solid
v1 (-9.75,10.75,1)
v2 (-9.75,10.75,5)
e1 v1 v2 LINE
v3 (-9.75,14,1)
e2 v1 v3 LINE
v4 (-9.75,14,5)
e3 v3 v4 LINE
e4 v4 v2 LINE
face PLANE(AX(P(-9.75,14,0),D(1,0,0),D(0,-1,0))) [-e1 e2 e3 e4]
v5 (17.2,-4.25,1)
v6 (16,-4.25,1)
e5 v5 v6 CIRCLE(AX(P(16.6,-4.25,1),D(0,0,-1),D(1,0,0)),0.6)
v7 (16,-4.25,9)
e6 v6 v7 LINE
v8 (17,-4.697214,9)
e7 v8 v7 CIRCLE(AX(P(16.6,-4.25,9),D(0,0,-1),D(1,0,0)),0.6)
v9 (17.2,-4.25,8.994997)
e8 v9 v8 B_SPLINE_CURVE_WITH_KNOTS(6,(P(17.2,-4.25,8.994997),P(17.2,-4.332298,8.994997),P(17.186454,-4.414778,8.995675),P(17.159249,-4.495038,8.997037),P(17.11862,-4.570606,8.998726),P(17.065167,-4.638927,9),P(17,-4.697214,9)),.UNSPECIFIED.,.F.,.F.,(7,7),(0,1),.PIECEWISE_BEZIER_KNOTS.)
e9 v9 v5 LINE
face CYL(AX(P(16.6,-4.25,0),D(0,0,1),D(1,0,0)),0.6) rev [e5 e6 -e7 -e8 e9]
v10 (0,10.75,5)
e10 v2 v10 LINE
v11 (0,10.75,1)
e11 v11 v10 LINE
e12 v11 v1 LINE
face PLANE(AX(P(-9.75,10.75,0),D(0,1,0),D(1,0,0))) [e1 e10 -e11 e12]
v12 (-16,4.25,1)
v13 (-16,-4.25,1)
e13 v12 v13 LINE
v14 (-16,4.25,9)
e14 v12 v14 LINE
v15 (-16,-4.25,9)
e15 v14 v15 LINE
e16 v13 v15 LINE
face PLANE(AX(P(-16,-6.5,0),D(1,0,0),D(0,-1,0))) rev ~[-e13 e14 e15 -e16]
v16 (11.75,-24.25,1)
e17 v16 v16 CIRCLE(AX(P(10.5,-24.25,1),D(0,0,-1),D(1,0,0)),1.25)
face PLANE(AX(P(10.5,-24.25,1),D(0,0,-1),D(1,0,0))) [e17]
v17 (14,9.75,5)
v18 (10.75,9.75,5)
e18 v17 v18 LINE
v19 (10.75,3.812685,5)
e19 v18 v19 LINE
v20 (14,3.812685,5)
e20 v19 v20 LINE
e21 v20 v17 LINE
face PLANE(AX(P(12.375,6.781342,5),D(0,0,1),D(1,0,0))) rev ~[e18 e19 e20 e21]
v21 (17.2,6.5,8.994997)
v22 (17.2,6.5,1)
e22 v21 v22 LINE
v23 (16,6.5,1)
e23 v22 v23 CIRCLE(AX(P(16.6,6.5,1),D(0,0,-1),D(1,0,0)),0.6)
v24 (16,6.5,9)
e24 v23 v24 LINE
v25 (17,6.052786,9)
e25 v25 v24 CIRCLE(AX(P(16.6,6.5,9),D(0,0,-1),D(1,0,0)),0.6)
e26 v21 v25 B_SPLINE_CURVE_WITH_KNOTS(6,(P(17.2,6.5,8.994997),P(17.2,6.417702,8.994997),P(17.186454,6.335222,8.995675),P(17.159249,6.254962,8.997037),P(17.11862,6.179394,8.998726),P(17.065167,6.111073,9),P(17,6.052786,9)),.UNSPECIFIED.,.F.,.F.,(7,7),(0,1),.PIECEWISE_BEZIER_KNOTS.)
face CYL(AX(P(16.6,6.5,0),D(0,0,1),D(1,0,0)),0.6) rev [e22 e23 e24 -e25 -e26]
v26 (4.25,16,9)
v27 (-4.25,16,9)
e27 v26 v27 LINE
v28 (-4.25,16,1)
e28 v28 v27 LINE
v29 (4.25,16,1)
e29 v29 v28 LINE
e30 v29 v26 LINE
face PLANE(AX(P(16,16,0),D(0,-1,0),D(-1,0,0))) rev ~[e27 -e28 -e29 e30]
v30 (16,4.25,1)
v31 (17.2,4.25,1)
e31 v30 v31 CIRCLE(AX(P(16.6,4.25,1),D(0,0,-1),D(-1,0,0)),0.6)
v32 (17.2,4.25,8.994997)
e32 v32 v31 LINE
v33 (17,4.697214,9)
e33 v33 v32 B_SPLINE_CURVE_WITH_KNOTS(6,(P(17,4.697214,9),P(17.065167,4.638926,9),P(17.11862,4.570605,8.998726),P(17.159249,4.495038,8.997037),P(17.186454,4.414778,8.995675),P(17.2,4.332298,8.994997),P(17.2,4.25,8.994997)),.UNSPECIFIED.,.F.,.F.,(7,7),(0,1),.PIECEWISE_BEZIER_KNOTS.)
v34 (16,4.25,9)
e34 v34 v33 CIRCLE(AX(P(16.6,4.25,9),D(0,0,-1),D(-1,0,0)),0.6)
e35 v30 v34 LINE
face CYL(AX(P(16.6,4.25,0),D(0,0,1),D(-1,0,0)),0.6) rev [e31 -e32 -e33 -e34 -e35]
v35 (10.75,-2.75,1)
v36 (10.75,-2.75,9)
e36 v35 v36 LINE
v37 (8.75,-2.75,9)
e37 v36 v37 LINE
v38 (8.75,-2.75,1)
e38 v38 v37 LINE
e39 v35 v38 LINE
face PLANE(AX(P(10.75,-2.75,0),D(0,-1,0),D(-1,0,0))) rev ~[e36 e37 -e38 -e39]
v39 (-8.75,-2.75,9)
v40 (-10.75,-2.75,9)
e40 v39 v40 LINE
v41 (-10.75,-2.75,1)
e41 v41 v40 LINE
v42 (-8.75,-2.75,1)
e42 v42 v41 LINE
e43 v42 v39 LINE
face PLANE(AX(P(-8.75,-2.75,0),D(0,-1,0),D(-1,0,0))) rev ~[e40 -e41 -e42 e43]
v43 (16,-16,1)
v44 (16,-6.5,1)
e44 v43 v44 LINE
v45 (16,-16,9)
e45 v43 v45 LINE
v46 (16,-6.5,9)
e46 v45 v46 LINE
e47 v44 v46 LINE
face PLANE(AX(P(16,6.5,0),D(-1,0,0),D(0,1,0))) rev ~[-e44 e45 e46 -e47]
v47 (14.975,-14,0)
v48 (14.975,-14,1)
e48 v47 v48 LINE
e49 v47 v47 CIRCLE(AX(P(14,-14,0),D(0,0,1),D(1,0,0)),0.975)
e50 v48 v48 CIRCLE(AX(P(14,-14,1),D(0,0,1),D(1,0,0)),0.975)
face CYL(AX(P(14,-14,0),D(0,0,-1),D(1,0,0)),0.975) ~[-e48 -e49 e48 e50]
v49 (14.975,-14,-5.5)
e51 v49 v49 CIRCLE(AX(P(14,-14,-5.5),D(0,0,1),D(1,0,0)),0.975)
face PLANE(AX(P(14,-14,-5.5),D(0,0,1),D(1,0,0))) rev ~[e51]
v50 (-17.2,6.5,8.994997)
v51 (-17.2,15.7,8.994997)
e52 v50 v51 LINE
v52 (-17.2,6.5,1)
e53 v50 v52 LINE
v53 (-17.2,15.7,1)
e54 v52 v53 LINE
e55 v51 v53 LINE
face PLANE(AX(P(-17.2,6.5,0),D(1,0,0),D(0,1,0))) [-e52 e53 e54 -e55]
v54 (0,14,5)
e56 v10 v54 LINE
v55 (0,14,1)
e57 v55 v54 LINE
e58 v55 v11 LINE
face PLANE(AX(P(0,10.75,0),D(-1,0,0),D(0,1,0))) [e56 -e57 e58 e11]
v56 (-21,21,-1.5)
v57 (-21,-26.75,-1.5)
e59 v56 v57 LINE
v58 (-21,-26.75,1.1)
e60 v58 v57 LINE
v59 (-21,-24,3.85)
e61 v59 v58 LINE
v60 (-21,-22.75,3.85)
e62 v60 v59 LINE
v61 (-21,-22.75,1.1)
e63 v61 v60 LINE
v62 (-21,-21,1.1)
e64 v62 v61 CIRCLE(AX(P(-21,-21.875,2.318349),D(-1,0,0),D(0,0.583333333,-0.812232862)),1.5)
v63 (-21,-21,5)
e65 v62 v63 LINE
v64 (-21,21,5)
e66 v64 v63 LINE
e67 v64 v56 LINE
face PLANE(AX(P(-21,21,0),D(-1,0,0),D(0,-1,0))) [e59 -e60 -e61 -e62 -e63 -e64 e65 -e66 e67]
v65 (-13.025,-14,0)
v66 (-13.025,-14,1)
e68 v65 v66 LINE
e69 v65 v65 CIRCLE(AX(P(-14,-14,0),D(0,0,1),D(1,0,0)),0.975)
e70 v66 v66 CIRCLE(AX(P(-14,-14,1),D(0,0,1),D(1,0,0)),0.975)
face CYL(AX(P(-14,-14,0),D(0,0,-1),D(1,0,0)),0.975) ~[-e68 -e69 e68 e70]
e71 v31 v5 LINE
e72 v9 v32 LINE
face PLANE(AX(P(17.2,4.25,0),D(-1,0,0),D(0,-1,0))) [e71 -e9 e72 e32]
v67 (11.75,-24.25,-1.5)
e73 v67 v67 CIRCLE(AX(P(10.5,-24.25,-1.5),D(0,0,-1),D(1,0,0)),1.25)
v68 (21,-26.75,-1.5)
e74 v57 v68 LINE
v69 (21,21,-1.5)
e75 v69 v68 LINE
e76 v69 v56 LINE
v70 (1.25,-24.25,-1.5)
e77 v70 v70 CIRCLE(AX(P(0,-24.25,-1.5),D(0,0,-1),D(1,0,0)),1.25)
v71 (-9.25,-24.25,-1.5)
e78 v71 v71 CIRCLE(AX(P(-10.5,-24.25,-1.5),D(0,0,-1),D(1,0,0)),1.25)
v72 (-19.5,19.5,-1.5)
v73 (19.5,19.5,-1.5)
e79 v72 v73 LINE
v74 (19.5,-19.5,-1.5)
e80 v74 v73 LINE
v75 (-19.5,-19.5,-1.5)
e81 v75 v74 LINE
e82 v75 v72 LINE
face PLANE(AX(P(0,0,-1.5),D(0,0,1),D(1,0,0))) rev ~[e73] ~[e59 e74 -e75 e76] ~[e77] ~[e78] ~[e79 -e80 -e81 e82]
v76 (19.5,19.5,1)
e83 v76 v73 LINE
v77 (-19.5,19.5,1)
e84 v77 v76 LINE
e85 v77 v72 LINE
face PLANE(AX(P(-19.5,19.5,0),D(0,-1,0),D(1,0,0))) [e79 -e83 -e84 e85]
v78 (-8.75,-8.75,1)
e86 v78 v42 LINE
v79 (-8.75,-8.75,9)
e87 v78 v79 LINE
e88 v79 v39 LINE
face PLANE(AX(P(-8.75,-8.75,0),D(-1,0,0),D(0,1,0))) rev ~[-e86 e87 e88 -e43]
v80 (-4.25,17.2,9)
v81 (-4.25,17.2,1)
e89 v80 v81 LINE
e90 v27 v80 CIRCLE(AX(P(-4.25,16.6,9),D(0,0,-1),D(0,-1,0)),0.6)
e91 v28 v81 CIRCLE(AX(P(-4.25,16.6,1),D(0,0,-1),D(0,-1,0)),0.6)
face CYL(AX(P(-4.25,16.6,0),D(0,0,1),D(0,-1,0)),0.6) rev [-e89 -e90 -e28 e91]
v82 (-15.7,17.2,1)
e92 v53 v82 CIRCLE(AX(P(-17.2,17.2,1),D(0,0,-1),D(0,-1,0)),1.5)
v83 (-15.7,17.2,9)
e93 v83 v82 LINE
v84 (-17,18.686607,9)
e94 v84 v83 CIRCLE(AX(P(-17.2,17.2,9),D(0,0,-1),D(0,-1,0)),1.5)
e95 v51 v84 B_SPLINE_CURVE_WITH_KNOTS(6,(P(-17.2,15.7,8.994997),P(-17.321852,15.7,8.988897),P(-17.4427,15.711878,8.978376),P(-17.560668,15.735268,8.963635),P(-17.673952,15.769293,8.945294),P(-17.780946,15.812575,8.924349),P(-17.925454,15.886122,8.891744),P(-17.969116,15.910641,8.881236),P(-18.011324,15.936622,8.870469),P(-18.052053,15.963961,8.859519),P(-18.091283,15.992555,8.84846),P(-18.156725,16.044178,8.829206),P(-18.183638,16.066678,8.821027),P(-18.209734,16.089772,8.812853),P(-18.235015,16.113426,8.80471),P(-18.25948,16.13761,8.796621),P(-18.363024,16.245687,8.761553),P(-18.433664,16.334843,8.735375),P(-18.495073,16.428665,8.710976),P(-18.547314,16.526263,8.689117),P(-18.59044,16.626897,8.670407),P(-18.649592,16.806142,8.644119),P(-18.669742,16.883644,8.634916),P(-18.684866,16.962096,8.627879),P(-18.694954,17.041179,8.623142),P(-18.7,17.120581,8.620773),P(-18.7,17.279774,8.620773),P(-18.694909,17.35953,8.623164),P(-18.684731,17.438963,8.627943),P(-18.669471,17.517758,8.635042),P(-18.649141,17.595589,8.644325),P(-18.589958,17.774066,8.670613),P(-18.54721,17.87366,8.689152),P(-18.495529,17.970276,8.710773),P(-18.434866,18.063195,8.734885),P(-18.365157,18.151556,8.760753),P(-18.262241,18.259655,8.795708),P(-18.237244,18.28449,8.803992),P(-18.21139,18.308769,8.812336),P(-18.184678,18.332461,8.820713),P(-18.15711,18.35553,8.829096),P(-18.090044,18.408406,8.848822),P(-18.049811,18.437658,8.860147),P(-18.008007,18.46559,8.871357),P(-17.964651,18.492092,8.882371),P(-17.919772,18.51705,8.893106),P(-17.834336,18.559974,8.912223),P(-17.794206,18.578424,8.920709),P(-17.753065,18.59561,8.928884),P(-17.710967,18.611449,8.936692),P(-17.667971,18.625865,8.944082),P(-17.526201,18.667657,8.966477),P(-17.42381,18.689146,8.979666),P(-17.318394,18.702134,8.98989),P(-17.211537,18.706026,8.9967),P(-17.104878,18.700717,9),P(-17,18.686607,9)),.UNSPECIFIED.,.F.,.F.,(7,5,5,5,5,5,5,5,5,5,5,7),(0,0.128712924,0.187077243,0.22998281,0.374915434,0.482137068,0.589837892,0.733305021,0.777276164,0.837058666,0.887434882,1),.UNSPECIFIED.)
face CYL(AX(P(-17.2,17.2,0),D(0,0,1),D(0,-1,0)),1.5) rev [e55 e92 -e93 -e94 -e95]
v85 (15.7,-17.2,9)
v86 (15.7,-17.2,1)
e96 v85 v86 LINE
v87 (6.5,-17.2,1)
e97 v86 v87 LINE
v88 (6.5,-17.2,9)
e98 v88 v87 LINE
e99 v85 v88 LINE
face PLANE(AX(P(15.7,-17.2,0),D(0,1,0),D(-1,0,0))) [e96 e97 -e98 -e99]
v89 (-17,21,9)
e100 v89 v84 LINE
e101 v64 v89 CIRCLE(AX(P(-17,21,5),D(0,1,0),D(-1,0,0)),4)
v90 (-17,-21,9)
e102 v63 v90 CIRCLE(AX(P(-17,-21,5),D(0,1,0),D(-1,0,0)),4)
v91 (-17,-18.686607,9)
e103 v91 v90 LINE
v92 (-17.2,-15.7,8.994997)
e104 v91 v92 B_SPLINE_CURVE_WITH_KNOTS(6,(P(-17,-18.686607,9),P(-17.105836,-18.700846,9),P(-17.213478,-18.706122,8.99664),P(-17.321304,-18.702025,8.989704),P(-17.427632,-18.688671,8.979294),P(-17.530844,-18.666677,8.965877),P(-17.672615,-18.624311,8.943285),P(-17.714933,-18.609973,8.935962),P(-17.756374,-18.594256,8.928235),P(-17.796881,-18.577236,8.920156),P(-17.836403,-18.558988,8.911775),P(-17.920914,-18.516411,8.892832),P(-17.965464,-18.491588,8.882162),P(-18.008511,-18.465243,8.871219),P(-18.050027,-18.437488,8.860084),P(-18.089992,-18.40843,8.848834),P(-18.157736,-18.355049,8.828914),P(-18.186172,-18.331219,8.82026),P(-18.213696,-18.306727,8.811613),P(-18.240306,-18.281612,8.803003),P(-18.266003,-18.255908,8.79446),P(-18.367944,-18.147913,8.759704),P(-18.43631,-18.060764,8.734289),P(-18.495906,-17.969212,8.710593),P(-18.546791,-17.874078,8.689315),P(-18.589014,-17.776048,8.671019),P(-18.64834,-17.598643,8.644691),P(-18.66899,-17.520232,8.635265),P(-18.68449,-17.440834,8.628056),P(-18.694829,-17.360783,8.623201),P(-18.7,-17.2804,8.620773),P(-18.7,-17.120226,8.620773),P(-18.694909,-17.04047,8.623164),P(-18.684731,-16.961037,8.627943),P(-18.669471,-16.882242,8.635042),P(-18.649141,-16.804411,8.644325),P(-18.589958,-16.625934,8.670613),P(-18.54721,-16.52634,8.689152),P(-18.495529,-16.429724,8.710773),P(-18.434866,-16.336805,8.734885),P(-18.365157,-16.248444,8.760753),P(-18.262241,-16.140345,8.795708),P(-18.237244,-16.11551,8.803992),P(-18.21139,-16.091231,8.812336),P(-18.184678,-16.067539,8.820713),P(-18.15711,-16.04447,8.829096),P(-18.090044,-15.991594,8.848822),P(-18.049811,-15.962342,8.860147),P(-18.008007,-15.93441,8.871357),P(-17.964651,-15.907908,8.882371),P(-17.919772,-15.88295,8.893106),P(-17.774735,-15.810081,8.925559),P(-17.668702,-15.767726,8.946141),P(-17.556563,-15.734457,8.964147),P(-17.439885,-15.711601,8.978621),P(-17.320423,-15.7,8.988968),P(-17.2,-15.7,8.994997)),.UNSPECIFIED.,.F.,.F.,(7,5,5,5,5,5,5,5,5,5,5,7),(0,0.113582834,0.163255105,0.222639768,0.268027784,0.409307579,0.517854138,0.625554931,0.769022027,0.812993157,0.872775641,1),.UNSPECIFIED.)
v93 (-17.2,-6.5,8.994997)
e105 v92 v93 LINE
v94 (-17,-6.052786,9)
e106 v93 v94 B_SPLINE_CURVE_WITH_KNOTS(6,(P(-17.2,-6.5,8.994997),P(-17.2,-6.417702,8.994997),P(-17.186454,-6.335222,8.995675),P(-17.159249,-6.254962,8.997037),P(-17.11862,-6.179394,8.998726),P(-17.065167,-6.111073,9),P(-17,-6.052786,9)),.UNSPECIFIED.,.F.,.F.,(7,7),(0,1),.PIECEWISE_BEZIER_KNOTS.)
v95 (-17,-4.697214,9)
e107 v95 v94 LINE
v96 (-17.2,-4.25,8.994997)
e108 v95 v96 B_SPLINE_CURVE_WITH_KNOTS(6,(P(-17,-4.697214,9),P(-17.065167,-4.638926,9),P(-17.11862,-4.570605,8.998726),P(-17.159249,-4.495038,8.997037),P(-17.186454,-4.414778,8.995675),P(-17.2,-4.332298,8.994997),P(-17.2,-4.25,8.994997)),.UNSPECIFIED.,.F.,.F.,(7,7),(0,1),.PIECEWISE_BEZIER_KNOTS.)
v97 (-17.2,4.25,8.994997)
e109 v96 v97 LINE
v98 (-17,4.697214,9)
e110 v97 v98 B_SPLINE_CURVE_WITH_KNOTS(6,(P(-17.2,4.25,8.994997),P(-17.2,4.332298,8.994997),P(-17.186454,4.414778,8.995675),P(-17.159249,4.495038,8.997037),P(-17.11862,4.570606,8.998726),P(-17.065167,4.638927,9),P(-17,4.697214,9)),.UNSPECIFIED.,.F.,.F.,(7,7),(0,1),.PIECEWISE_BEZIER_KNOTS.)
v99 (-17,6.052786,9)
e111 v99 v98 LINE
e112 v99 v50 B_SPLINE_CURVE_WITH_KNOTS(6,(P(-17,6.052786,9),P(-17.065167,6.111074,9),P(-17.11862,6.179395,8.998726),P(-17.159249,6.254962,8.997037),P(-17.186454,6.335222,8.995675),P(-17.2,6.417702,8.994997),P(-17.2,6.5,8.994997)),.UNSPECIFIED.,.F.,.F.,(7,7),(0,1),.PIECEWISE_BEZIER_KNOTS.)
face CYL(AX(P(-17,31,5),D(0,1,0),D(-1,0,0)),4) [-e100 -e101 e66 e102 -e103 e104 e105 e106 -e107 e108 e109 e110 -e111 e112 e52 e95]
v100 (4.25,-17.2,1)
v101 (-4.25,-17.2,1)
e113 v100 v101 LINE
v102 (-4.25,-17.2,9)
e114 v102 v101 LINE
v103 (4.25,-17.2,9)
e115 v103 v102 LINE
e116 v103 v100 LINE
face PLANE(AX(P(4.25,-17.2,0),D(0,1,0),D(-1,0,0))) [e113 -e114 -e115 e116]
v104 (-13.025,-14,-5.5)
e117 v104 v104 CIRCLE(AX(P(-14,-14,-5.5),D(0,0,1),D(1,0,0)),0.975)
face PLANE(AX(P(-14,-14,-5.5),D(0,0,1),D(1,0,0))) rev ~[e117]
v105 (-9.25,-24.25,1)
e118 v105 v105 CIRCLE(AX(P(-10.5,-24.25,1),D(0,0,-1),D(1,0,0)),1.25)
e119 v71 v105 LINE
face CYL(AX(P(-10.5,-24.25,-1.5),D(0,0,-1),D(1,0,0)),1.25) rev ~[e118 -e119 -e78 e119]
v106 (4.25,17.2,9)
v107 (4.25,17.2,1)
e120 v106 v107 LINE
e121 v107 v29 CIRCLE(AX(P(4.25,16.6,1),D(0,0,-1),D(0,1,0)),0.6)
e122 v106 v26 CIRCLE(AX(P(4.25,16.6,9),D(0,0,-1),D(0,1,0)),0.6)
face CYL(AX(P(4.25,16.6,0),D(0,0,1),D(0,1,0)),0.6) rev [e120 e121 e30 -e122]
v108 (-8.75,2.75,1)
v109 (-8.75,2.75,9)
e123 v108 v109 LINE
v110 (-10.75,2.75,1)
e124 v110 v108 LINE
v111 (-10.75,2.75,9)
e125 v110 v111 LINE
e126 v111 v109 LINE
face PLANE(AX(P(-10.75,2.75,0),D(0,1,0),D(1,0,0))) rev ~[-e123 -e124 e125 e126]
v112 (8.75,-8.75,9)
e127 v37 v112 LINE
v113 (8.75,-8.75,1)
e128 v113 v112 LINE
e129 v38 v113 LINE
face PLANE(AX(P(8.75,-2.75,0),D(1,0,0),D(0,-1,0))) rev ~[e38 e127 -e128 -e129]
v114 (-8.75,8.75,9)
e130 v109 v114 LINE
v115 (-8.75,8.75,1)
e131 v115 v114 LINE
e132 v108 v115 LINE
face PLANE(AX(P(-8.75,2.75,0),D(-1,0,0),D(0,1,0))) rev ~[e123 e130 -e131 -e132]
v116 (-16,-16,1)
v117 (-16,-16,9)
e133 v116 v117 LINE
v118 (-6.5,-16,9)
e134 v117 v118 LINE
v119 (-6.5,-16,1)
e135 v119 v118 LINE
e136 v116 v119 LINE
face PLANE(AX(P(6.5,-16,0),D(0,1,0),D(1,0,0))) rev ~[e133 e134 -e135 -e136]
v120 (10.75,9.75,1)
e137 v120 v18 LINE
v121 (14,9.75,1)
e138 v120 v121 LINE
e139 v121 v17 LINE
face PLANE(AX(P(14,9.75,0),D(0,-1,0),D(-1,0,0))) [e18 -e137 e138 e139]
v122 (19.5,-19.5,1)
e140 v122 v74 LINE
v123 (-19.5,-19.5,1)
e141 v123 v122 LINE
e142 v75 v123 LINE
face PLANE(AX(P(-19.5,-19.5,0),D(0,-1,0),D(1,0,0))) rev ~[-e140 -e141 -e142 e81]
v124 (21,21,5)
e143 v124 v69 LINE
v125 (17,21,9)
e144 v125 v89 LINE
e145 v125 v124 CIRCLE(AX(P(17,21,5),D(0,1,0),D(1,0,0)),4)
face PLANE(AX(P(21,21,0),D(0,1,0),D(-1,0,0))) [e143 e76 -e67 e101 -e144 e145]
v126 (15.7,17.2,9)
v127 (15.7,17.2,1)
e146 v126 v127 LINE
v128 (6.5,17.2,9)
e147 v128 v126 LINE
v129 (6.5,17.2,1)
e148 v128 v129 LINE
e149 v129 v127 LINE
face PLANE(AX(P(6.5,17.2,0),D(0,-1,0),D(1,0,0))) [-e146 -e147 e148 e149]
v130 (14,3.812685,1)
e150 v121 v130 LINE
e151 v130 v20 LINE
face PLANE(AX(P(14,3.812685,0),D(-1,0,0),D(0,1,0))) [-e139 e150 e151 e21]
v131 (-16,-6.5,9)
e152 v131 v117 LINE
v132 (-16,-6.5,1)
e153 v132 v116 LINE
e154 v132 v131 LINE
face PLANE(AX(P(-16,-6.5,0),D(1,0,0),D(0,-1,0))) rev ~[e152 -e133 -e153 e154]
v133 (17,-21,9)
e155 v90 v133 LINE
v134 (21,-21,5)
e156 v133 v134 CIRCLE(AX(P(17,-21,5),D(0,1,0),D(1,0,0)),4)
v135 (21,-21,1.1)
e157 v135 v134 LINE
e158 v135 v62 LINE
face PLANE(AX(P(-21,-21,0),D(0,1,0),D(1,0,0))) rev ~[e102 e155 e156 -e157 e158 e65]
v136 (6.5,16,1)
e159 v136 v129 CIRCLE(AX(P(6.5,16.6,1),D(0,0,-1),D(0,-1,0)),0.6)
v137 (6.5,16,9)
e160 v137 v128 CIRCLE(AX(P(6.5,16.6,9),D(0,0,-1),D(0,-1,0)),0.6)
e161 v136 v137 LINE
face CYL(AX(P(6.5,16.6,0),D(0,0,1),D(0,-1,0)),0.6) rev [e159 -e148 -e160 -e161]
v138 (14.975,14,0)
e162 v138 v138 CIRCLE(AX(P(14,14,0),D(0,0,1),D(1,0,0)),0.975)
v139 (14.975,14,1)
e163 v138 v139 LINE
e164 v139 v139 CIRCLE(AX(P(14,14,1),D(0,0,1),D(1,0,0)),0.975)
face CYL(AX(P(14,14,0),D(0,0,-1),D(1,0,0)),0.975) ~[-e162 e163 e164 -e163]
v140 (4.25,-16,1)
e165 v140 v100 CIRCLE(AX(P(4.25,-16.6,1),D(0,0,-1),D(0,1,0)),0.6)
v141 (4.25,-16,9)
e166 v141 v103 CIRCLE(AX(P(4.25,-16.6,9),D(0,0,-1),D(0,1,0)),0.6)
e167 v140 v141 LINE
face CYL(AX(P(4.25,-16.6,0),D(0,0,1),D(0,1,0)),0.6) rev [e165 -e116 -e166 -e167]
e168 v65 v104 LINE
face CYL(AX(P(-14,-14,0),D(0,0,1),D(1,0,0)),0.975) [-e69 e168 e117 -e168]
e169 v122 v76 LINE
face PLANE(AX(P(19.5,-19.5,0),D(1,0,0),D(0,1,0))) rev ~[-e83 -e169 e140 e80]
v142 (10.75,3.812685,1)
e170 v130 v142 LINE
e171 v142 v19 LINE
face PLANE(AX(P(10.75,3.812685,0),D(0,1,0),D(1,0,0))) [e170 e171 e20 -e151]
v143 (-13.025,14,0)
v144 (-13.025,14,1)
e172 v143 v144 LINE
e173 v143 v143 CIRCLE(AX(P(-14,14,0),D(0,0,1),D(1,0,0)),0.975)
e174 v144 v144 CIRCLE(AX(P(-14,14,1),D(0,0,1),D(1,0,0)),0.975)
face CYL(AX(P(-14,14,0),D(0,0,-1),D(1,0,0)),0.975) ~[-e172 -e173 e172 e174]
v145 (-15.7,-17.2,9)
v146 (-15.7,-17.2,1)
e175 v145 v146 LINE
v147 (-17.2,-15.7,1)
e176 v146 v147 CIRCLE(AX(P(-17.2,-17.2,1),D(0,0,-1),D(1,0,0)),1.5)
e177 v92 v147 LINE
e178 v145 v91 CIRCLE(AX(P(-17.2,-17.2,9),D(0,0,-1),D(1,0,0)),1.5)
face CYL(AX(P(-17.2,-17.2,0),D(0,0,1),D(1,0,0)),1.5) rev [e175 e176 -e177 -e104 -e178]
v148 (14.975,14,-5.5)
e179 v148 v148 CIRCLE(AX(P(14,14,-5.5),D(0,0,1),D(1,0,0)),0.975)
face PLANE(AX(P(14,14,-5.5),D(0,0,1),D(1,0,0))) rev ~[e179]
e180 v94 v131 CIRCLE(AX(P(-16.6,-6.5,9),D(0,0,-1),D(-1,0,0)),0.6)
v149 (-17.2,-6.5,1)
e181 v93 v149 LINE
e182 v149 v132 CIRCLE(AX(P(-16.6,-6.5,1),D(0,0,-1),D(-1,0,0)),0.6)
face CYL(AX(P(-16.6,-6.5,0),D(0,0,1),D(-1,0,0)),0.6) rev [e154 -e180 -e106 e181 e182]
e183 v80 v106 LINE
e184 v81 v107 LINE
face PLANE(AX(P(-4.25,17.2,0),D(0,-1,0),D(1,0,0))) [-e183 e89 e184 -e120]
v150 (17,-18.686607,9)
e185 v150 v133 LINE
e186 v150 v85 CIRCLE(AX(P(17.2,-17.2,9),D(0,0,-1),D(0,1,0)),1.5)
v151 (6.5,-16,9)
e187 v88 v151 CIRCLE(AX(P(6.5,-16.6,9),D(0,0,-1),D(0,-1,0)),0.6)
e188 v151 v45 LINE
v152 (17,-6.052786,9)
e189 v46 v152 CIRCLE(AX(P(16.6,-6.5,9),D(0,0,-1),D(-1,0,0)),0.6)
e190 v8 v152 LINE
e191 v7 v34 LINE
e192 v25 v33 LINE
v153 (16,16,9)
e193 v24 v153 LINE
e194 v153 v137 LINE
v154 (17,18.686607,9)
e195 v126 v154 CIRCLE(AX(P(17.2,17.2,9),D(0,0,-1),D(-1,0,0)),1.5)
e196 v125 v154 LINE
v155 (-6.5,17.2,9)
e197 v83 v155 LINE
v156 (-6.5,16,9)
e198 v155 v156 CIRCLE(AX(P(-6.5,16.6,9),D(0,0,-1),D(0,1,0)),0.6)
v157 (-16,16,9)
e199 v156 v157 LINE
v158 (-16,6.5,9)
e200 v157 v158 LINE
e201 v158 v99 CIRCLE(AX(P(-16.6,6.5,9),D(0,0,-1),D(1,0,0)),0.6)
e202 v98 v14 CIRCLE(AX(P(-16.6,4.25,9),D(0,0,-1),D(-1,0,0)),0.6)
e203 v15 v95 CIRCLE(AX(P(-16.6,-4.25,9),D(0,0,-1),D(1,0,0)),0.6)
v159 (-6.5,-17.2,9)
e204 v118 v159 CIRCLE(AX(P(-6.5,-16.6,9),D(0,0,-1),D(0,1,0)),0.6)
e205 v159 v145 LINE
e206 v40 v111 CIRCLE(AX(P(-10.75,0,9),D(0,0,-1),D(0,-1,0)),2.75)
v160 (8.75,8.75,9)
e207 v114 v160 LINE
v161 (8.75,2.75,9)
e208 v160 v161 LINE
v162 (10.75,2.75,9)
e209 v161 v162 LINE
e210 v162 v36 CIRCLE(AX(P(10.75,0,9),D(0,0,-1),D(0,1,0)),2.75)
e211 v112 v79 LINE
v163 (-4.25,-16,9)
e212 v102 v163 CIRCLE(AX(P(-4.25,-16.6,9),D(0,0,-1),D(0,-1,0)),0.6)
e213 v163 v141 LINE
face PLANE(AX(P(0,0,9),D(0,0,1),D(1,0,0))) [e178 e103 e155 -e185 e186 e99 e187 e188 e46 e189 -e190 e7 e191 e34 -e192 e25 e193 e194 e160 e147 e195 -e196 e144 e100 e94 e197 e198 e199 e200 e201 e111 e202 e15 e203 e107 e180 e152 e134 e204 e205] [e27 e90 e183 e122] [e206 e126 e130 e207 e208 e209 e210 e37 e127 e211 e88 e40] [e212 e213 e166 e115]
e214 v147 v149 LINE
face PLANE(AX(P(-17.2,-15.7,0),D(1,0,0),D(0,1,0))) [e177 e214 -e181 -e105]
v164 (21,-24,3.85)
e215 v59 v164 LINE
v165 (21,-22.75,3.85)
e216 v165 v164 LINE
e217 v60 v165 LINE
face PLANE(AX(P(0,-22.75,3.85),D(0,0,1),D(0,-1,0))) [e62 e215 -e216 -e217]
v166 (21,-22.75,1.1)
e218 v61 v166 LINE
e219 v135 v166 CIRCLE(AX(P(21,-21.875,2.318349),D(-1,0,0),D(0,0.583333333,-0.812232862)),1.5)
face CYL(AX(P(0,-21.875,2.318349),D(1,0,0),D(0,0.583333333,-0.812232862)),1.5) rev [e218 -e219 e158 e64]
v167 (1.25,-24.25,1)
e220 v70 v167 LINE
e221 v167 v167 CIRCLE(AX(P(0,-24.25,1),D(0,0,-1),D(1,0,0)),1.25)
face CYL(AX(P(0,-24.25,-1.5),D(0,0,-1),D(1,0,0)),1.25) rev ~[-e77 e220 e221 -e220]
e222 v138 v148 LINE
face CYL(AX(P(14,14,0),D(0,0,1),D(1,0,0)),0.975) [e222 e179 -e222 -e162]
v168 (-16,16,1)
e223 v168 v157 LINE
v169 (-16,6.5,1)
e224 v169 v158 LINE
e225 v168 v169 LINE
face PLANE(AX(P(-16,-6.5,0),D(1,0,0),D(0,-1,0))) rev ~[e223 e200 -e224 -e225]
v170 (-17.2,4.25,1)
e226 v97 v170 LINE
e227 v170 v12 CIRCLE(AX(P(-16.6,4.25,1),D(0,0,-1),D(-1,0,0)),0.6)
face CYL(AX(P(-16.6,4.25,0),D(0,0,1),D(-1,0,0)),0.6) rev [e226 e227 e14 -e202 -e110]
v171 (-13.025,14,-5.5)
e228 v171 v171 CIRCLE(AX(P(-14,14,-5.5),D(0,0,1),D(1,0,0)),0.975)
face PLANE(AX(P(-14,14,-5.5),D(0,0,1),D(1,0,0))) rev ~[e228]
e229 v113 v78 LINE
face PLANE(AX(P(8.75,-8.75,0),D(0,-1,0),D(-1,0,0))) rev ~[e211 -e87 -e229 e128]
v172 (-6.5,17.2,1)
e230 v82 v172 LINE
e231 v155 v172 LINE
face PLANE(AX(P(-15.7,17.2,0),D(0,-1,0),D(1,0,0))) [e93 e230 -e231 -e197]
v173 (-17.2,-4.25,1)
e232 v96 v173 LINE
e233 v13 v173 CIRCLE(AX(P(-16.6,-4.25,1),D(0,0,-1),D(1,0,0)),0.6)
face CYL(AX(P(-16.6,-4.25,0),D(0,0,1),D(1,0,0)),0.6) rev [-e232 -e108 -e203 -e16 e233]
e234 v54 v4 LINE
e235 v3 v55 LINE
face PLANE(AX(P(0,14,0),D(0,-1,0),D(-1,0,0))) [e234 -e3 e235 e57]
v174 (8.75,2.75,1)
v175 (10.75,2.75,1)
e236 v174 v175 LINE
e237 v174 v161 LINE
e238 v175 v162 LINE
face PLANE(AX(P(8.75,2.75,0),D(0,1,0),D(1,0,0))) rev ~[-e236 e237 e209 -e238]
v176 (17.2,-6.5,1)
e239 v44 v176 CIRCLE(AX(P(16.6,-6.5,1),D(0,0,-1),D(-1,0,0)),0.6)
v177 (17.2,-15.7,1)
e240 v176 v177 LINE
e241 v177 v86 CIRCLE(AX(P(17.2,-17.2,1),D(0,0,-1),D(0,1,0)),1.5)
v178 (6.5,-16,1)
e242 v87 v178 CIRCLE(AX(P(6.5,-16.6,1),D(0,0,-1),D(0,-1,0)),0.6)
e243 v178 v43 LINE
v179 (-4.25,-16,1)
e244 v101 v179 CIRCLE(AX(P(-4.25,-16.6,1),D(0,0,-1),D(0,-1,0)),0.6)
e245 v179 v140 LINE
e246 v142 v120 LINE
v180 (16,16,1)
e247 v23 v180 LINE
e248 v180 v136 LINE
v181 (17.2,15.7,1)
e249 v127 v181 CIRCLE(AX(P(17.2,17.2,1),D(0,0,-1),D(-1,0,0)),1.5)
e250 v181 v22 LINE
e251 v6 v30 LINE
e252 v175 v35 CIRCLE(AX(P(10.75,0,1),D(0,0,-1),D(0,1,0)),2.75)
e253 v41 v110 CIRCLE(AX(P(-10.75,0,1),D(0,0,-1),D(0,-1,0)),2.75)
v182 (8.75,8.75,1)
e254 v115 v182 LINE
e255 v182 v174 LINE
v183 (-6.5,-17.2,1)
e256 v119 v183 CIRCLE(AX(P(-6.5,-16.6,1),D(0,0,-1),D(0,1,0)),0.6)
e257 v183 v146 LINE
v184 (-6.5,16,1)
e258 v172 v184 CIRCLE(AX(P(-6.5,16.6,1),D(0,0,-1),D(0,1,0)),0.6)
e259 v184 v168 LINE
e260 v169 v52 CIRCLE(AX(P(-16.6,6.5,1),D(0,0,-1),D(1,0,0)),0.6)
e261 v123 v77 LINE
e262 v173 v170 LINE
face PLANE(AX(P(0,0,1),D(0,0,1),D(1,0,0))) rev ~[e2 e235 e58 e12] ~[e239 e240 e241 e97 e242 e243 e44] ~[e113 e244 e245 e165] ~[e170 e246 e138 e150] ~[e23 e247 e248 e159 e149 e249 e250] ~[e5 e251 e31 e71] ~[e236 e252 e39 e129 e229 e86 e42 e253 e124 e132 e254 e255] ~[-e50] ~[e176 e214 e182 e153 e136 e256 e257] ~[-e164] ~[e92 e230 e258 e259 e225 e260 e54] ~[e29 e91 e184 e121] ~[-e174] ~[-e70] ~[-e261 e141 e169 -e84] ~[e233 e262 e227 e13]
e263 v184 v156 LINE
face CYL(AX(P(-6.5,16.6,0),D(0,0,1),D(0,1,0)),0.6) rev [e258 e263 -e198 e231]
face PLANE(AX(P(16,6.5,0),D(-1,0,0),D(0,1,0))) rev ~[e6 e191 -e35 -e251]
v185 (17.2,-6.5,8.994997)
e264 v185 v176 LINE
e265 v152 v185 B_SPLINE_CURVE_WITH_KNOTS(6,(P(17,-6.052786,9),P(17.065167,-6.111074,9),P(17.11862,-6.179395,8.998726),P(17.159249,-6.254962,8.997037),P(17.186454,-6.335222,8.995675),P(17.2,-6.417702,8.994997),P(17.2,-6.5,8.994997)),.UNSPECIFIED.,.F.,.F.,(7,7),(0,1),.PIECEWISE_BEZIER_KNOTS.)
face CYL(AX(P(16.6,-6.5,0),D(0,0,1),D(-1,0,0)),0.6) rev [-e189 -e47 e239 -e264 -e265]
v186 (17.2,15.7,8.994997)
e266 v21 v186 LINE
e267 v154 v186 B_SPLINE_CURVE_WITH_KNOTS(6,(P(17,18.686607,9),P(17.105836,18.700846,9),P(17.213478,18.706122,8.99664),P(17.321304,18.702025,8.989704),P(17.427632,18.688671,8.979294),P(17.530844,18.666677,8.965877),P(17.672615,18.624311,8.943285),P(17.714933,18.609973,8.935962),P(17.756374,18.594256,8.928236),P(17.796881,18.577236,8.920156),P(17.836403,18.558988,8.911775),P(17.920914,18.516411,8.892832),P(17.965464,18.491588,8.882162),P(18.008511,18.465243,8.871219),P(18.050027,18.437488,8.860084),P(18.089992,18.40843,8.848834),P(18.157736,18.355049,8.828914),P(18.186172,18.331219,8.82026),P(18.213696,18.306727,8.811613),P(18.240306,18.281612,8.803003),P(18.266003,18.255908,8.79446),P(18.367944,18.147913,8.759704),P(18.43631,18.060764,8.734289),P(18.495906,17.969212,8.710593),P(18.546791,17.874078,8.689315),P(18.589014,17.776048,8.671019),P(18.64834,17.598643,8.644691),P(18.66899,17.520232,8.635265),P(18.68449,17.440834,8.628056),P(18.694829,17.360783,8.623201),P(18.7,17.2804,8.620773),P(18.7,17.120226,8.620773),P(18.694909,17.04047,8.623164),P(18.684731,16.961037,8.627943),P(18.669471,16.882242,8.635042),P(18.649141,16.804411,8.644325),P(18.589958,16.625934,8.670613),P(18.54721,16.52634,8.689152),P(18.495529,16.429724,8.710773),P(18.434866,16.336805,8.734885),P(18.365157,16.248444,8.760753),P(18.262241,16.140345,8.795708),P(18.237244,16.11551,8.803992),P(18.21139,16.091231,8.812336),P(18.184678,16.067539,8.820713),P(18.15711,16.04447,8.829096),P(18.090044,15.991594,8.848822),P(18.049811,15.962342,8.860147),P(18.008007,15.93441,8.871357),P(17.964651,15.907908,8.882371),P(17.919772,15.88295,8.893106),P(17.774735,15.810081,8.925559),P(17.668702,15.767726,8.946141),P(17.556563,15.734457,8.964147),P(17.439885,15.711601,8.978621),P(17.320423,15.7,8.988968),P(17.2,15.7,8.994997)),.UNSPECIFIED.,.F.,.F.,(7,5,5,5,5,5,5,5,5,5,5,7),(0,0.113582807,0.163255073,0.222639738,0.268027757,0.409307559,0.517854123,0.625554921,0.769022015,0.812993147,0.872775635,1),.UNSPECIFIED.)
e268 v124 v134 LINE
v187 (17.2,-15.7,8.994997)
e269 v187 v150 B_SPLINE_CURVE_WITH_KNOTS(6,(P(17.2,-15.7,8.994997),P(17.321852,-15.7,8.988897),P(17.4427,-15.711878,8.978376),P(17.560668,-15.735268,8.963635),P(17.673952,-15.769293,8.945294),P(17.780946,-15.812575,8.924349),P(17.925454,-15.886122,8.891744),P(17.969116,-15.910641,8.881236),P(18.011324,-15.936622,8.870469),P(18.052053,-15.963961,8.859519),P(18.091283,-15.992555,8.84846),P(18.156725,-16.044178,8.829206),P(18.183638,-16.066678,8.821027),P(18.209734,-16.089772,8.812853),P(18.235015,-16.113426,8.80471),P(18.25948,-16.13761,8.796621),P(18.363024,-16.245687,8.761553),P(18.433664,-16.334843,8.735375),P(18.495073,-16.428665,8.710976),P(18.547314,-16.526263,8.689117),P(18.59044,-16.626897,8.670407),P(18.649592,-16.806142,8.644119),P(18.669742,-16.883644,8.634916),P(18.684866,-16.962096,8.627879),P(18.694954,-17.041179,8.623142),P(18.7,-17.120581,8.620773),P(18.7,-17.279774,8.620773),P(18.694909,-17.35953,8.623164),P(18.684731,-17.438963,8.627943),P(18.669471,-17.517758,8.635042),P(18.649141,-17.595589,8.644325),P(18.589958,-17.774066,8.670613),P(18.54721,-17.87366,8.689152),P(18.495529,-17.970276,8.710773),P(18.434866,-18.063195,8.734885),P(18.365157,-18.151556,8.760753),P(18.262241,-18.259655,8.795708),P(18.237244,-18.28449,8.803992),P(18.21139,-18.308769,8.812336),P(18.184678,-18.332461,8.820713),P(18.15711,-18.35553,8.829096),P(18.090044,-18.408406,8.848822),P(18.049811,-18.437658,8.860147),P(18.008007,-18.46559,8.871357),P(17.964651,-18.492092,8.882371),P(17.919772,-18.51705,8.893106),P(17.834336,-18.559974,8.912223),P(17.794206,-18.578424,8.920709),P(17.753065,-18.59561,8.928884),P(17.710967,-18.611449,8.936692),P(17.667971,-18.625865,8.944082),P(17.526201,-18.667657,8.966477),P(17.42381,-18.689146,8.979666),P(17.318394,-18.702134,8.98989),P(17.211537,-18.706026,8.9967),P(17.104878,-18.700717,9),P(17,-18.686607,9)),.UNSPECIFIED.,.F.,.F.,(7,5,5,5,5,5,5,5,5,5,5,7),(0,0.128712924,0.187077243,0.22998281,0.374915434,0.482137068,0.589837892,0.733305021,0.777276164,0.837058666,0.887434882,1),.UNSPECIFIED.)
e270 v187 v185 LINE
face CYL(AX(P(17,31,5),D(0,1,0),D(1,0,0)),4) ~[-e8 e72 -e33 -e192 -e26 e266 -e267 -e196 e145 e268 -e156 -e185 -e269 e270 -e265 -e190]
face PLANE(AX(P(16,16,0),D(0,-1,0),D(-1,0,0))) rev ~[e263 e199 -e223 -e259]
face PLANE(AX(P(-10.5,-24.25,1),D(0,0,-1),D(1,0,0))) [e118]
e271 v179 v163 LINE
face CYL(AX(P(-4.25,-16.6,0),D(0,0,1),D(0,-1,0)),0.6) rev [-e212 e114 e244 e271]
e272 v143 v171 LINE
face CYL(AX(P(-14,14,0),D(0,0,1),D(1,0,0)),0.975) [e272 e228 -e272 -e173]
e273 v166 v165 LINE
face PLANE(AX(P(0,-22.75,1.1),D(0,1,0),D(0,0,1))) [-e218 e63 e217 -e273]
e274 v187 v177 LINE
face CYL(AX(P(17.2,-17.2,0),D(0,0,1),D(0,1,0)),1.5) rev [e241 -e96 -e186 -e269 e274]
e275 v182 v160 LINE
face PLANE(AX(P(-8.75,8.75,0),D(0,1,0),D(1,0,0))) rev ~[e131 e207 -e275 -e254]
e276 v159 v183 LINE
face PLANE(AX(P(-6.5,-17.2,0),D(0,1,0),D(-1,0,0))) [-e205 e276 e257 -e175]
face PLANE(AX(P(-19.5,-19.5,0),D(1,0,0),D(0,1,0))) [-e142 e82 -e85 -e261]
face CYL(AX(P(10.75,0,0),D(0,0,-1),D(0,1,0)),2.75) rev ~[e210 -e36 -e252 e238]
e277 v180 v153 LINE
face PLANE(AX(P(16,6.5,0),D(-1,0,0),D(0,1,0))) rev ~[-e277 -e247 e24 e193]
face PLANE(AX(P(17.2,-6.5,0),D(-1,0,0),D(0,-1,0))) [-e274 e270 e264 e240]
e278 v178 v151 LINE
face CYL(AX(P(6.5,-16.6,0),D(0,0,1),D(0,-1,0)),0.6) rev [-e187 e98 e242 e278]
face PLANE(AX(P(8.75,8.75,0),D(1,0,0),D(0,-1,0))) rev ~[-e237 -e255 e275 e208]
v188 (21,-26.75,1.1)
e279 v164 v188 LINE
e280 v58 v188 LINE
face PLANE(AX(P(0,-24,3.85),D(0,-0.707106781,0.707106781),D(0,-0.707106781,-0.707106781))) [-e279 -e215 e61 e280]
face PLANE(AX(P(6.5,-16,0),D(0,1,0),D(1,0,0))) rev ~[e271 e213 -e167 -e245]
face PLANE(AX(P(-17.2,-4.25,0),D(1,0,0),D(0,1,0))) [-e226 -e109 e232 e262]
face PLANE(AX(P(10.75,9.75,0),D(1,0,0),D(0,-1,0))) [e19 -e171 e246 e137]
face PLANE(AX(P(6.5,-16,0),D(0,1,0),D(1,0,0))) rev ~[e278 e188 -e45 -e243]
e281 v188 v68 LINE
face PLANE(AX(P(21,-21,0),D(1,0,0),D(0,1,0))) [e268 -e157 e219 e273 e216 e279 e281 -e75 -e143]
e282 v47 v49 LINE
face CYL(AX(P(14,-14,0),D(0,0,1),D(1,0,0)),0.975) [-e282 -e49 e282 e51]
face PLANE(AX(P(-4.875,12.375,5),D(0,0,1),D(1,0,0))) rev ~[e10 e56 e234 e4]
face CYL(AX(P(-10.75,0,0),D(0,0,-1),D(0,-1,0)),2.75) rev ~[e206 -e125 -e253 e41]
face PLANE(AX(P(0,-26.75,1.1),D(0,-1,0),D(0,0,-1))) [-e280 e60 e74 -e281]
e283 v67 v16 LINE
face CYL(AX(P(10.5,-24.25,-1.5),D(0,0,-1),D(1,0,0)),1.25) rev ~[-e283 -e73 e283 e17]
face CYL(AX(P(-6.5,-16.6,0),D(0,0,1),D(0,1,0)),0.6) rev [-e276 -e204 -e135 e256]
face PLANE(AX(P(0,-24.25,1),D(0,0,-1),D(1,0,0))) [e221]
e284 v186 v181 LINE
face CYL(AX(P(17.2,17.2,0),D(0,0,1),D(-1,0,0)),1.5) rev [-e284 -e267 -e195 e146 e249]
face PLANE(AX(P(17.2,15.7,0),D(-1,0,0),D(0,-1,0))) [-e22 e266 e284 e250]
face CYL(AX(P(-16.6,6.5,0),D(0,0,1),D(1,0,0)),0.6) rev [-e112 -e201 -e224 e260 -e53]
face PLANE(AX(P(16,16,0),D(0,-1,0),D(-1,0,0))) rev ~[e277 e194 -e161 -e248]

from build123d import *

# Parameters (mm, degrees)
F0_W        = 39
F0_H        = 39
F0_R        = 0.975
F1_DEPTH    = 9
F2_T1_DEPTH = 62
F4_DEPTH    = 21
F5_DEPTH    = 21
F6_DEPTH    = 5.5
F7_DEPTH    = 1.5
F8_DEPTH    = 2.5
F9_DEPTH    = 1.5
F10_R       = 1.25
F11_DEPTH   = 2.5
F12_DEPTH   = 5
F13_DEPTH   = 1


# Not quite as in the source:
# - a fillet or chamfer that OpenCascade refuses, or shapes differently, is made with other operations: its cross-section is extruded or revolved along the edge and cut away or added


with BuildPart() as f1:
    # F0 (on Top) → F1 (new body)
    with BuildSketch(Plane.XY):
        Polygon((-2.625, 21), (-21, 21), (-21, -21), (-2.625, -21), (2.625, -21), (21, -21), (21, 21), (2.625, 21), align=None)
        Rectangle(F0_W, F0_H, mode=Mode.SUBTRACT)
        Rectangle(F0_W, F0_H)
        with BuildLine():
            ThreePointArc((16, 4.25), (16.6, 4.85), (17.2, 4.25))
            Line((17.2, 4.25), (17.2, -4.25))
            ThreePointArc((17.2, -4.25), (16.6, -4.85), (16, -4.25))
            Line((16, -4.25), (16, -6.5))
            ThreePointArc((16, -6.5), (16.6, -5.9), (17.2, -6.5))
            Line((17.2, -6.5), (17.2, -15.7))
            ThreePointArc((17.2, -15.7), (18.2606601718, -18.2606601718), (15.7, -17.2))
            Line((15.7, -17.2), (6.5, -17.2))
            ThreePointArc((6.5, -17.2), (5.9, -16.6), (6.5, -16))
            Line((6.5, -16), (4.25, -16))
            ThreePointArc((4.25, -16), (4.85, -16.6), (4.25, -17.2))
            Line((4.25, -17.2), (-4.25, -17.2))
            ThreePointArc((-4.25, -17.2), (-4.85, -16.6), (-4.25, -16))
            Line((-4.25, -16), (-6.5, -16))
            ThreePointArc((-6.5, -16), (-5.9, -16.6), (-6.5, -17.2))
            Line((-6.5, -17.2), (-15.7, -17.2))
            ThreePointArc((-15.7, -17.2), (-18.2606601718, -18.2606601718), (-17.2, -15.7))
            Line((-17.2, -15.7), (-17.2, -6.5))
            ThreePointArc((-17.2, -6.5), (-16.6, -5.9), (-16, -6.5))
            Line((-16, -6.5), (-16, -4.25))
            ThreePointArc((-16, -4.25), (-16.6, -4.85), (-17.2, -4.25))
            Line((-17.2, -4.25), (-17.2, 4.25))
            ThreePointArc((-17.2, 4.25), (-16.6, 4.85), (-16, 4.25))
            Line((-16, 4.25), (-16, 6.5))
            ThreePointArc((-16, 6.5), (-16.6, 5.9), (-17.2, 6.5))
            Line((-17.2, 6.5), (-17.2, 15.7))
            ThreePointArc((-17.2, 15.7), (-18.2606601718, 18.2606601718), (-15.7, 17.2))
            Line((-15.7, 17.2), (-6.5, 17.2))
            ThreePointArc((-6.5, 17.2), (-5.9, 16.6), (-6.5, 16))
            Line((-6.5, 16), (-4.25, 16))
            ThreePointArc((-4.25, 16), (-4.85, 16.6), (-4.25, 17.2))
            Line((-4.25, 17.2), (4.25, 17.2))
            ThreePointArc((4.25, 17.2), (4.85, 16.6), (4.25, 16))
            Line((4.25, 16), (6.5, 16))
            ThreePointArc((6.5, 16), (5.9, 16.6), (6.5, 17.2))
            Line((6.5, 17.2), (15.7, 17.2))
            ThreePointArc((15.7, 17.2), (18.2606601718, 18.2606601718), (17.2, 15.7))
            Line((17.2, 15.7), (17.2, 6.5))
            ThreePointArc((17.2, 6.5), (16.6, 5.9), (16, 6.5))
            Line((16, 6.5), (16, 4.25))
        make_face(mode=Mode.SUBTRACT)
        Polygon((16, -4.25), (16, 4.25), (16, 6.5), (16, 16), (6.5, 16), (4.25, 16), (-4.25, 16), (-6.5, 16), (-16, 16), (-16, 6.5), (-16, 4.25), (-16, -4.25), (-16, -6.5), (-16, -16), (-6.5, -16), (-4.25, -16), (4.25, -16), (6.5, -16), (16, -16), (16, -6.5), align=None)
        with Locations((-14, -14)):
            Circle(F0_R, mode=Mode.SUBTRACT)
        with Locations((14, -14)):
            Circle(F0_R, mode=Mode.SUBTRACT)
        with Locations((-14, 14)):
            Circle(F0_R, mode=Mode.SUBTRACT)
        Polygon((-8.75, 14), (0, 14), (0, 10.75), (-8.75, 10.75), (-9.75, 10.75), (-9.75, 14), align=None, mode=Mode.SUBTRACT)
        with BuildLine():
            Line((-8.75, 8.75), (8.75, 8.75))
            Line((8.75, 8.75), (8.75, 2.75))
            Line((8.75, 2.75), (10.75, 2.75))
            ThreePointArc((10.75, 2.75), (13.5, 0), (10.75, -2.75))
            Line((10.75, -2.75), (8.75, -2.75))
            Line((8.75, -2.75), (8.75, -8.75))
            Line((8.75, -8.75), (-8.75, -8.75))
            Line((-8.75, -8.75), (-8.75, -2.75))
            Line((-8.75, -2.75), (-10.75, -2.75))
            ThreePointArc((-10.75, -2.75), (-13.5, 0), (-10.75, 2.75))
            Line((-10.75, 2.75), (-8.75, 2.75))
            Line((-8.75, 2.75), (-8.75, 8.75))
        make_face(mode=Mode.SUBTRACT)
        Polygon((10.75, 3.8126846775), (10.75, 8.75), (10.75, 9.75), (14, 9.75), (14, 8.75), (14, 3.8126846775), align=None, mode=Mode.SUBTRACT)
        with Locations((14, 14)):
            Circle(F0_R, mode=Mode.SUBTRACT)
        Polygon((0, 10.75), (0, 14), (-8.75, 14), (-9.75, 14), (-9.75, 10.75), (-8.75, 10.75), align=None)
        Polygon((10.75, 9.75), (10.75, 8.75), (10.75, 3.8126846775), (14, 3.8126846775), (14, 8.75), (14, 9.75), align=None)
        with Locations((14, -14)):
            Circle(F0_R)
        with Locations((-14, -14)):
            Circle(F0_R)
        with Locations((-14, 14)):
            Circle(F0_R)
        with Locations((14, 14)):
            Circle(F0_R)
    extrude(amount=F1_DEPTH)

    # F2: fillet of radius 4 on 2 edges, made by hand

    # F2_s2 → F2_t1 (cut)
    with BuildSketch(Plane.XZ.offset(-31)):
        with BuildLine():
            ThreePointArc((-21, 5), (-19.8284271247, 7.8284271247), (-17, 9))
            Line((-17, 9), (-21, 9))
            Line((-21, 9), (-21, 5))
        make_face()
        with BuildLine():
            ThreePointArc((21, 5), (19.8284271247, 7.8284271247), (17, 9))
            Line((17, 9), (21, 9))
            Line((21, 9), (21, 5))
        make_face()
    extrude(amount=F2_T1_DEPTH, mode=Mode.SUBTRACT)

    # F3 (on Right) → F4 (join)
    with BuildSketch(Plane.YZ):
        with BuildLine():
            Line((-21, 0), (-21, 1.1))
            ThreePointArc((-21, 1.1), (-21.875, 0.8183492931), (-22.75, 1.1))
            Line((-22.75, 1.1), (-22.75, 3.85))
            Line((-22.75, 3.85), (-24, 3.85))
            Line((-24, 3.85), (-26.75, 1.1))
            Line((-26.75, 1.1), (-26.75, -1.5))
            Line((-26.75, -1.5), (-22.75, -1.5))
            Line((-22.75, -1.5), (-21, -1.5))
            Line((-21, -1.5), (-21, 0))
        make_face()
    extrude(amount=F4_DEPTH)

    # F5 (add): a face of the model
    f5_faces = [f1.faces().sort_by_distance(p)[0] for p in [
        (0, -24.00739598, 0.5868334208),
    ]]
    extrude(f5_faces, amount=F5_DEPTH)

    # F0 (on Top) → F6 (join)
    with BuildSketch(Plane.XY):
        with Locations((-14, -14)):
            Circle(F0_R)
        with Locations((14, -14)):
            Circle(F0_R)
        with Locations((-14, 14)):
            Circle(F0_R)
        with Locations((14, 14)):
            Circle(F0_R)
    extrude(amount=-F6_DEPTH)

    # F0 (on Top) → F7 (join)
    with BuildSketch(Plane.XY):
        Rectangle(F0_W, F0_H)
        with BuildLine():
            ThreePointArc((16, 4.25), (16.6, 4.85), (17.2, 4.25))
            Line((17.2, 4.25), (17.2, -4.25))
            ThreePointArc((17.2, -4.25), (16.6, -4.85), (16, -4.25))
            Line((16, -4.25), (16, -6.5))
            ThreePointArc((16, -6.5), (16.6, -5.9), (17.2, -6.5))
            Line((17.2, -6.5), (17.2, -15.7))
            ThreePointArc((17.2, -15.7), (18.2606601718, -18.2606601718), (15.7, -17.2))
            Line((15.7, -17.2), (6.5, -17.2))
            ThreePointArc((6.5, -17.2), (5.9, -16.6), (6.5, -16))
            Line((6.5, -16), (4.25, -16))
            ThreePointArc((4.25, -16), (4.85, -16.6), (4.25, -17.2))
            Line((4.25, -17.2), (-4.25, -17.2))
            ThreePointArc((-4.25, -17.2), (-4.85, -16.6), (-4.25, -16))
            Line((-4.25, -16), (-6.5, -16))
            ThreePointArc((-6.5, -16), (-5.9, -16.6), (-6.5, -17.2))
            Line((-6.5, -17.2), (-15.7, -17.2))
            ThreePointArc((-15.7, -17.2), (-18.2606601718, -18.2606601718), (-17.2, -15.7))
            Line((-17.2, -15.7), (-17.2, -6.5))
            ThreePointArc((-17.2, -6.5), (-16.6, -5.9), (-16, -6.5))
            Line((-16, -6.5), (-16, -4.25))
            ThreePointArc((-16, -4.25), (-16.6, -4.85), (-17.2, -4.25))
            Line((-17.2, -4.25), (-17.2, 4.25))
            ThreePointArc((-17.2, 4.25), (-16.6, 4.85), (-16, 4.25))
            Line((-16, 4.25), (-16, 6.5))
            ThreePointArc((-16, 6.5), (-16.6, 5.9), (-17.2, 6.5))
            Line((-17.2, 6.5), (-17.2, 15.7))
            ThreePointArc((-17.2, 15.7), (-18.2606601718, 18.2606601718), (-15.7, 17.2))
            Line((-15.7, 17.2), (-6.5, 17.2))
            ThreePointArc((-6.5, 17.2), (-5.9, 16.6), (-6.5, 16))
            Line((-6.5, 16), (-4.25, 16))
            ThreePointArc((-4.25, 16), (-4.85, 16.6), (-4.25, 17.2))
            Line((-4.25, 17.2), (4.25, 17.2))
            ThreePointArc((4.25, 17.2), (4.85, 16.6), (4.25, 16))
            Line((4.25, 16), (6.5, 16))
            ThreePointArc((6.5, 16), (5.9, 16.6), (6.5, 17.2))
            Line((6.5, 17.2), (15.7, 17.2))
            ThreePointArc((15.7, 17.2), (18.2606601718, 18.2606601718), (17.2, 15.7))
            Line((17.2, 15.7), (17.2, 6.5))
            ThreePointArc((17.2, 6.5), (16.6, 5.9), (16, 6.5))
            Line((16, 6.5), (16, 4.25))
        make_face(mode=Mode.SUBTRACT)
    extrude(amount=-F7_DEPTH)

    # F8 (cut): a face of the model
    f8_faces = [f1.faces().sort_by_distance(p)[0] for p in [
        (-18.9484567107, 0, -1.5),
    ]]
    extrude(f8_faces, amount=-F8_DEPTH, mode=Mode.SUBTRACT)

    # F0 (on Top) → F9 (join)
    with BuildSketch(Plane.XY):
        Polygon((-2.625, 21), (-21, 21), (-21, -21), (-2.625, -21), (2.625, -21), (21, -21), (21, 21), (2.625, 21), align=None)
        Rectangle(F0_W, F0_H, mode=Mode.SUBTRACT)
    extrude(amount=-F9_DEPTH)

    # F10 (on face) → F11 (cut)
    with BuildSketch(Plane(origin=(0, 0, -1.5), x_dir=(1, 0, 0), z_dir=(0, 0, -1))):
        with Locations((10.5, 24.25)):
            Circle(F10_R)
        with Locations((0, 24.25)):
            Circle(F10_R)
        with Locations((-10.5, 24.25)):
            Circle(F10_R)
    extrude(amount=-F11_DEPTH, mode=Mode.SUBTRACT)

    # F0 (on Top) → F12 (cut)
    with BuildSketch(Plane.XY):
        Polygon((10.75, 9.75), (10.75, 8.75), (10.75, 3.8126846775), (14, 3.8126846775), (14, 8.75), (14, 9.75), align=None)
        Polygon((0, 10.75), (0, 14), (-8.75, 14), (-9.75, 14), (-9.75, 10.75), (-8.75, 10.75), align=None)
    extrude(amount=F12_DEPTH, mode=Mode.SUBTRACT)

    # F0 (on Top) → F13 (cut)
    with BuildSketch(Plane.XY):
        Polygon((16, -4.25), (16, 4.25), (16, 6.5), (16, 16), (6.5, 16), (4.25, 16), (-4.25, 16), (-6.5, 16), (-16, 16), (-16, 6.5), (-16, 4.25), (-16, -4.25), (-16, -6.5), (-16, -16), (-6.5, -16), (-4.25, -16), (4.25, -16), (6.5, -16), (16, -16), (16, -6.5), align=None)
        with Locations((-14, -14)):
            Circle(F0_R, mode=Mode.SUBTRACT)
        with Locations((14, -14)):
            Circle(F0_R, mode=Mode.SUBTRACT)
        with Locations((-14, 14)):
            Circle(F0_R, mode=Mode.SUBTRACT)
        Polygon((-8.75, 14), (0, 14), (0, 10.75), (-8.75, 10.75), (-9.75, 10.75), (-9.75, 14), align=None, mode=Mode.SUBTRACT)
        with BuildLine():
            Line((-8.75, 8.75), (8.75, 8.75))
            Line((8.75, 8.75), (8.75, 2.75))
            Line((8.75, 2.75), (10.75, 2.75))
            ThreePointArc((10.75, 2.75), (13.5, 0), (10.75, -2.75))
            Line((10.75, -2.75), (8.75, -2.75))
            Line((8.75, -2.75), (8.75, -8.75))
            Line((8.75, -8.75), (-8.75, -8.75))
            Line((-8.75, -8.75), (-8.75, -2.75))
            Line((-8.75, -2.75), (-10.75, -2.75))
            ThreePointArc((-10.75, -2.75), (-13.5, 0), (-10.75, 2.75))
            Line((-10.75, 2.75), (-8.75, 2.75))
            Line((-8.75, 2.75), (-8.75, 8.75))
        make_face(mode=Mode.SUBTRACT)
        Polygon((10.75, 3.8126846775), (10.75, 8.75), (10.75, 9.75), (14, 9.75), (14, 8.75), (14, 3.8126846775), align=None, mode=Mode.SUBTRACT)
        with Locations((14, 14)):
            Circle(F0_R, mode=Mode.SUBTRACT)
    extrude(amount=F13_DEPTH, mode=Mode.SUBTRACT)


solid = f1.part
